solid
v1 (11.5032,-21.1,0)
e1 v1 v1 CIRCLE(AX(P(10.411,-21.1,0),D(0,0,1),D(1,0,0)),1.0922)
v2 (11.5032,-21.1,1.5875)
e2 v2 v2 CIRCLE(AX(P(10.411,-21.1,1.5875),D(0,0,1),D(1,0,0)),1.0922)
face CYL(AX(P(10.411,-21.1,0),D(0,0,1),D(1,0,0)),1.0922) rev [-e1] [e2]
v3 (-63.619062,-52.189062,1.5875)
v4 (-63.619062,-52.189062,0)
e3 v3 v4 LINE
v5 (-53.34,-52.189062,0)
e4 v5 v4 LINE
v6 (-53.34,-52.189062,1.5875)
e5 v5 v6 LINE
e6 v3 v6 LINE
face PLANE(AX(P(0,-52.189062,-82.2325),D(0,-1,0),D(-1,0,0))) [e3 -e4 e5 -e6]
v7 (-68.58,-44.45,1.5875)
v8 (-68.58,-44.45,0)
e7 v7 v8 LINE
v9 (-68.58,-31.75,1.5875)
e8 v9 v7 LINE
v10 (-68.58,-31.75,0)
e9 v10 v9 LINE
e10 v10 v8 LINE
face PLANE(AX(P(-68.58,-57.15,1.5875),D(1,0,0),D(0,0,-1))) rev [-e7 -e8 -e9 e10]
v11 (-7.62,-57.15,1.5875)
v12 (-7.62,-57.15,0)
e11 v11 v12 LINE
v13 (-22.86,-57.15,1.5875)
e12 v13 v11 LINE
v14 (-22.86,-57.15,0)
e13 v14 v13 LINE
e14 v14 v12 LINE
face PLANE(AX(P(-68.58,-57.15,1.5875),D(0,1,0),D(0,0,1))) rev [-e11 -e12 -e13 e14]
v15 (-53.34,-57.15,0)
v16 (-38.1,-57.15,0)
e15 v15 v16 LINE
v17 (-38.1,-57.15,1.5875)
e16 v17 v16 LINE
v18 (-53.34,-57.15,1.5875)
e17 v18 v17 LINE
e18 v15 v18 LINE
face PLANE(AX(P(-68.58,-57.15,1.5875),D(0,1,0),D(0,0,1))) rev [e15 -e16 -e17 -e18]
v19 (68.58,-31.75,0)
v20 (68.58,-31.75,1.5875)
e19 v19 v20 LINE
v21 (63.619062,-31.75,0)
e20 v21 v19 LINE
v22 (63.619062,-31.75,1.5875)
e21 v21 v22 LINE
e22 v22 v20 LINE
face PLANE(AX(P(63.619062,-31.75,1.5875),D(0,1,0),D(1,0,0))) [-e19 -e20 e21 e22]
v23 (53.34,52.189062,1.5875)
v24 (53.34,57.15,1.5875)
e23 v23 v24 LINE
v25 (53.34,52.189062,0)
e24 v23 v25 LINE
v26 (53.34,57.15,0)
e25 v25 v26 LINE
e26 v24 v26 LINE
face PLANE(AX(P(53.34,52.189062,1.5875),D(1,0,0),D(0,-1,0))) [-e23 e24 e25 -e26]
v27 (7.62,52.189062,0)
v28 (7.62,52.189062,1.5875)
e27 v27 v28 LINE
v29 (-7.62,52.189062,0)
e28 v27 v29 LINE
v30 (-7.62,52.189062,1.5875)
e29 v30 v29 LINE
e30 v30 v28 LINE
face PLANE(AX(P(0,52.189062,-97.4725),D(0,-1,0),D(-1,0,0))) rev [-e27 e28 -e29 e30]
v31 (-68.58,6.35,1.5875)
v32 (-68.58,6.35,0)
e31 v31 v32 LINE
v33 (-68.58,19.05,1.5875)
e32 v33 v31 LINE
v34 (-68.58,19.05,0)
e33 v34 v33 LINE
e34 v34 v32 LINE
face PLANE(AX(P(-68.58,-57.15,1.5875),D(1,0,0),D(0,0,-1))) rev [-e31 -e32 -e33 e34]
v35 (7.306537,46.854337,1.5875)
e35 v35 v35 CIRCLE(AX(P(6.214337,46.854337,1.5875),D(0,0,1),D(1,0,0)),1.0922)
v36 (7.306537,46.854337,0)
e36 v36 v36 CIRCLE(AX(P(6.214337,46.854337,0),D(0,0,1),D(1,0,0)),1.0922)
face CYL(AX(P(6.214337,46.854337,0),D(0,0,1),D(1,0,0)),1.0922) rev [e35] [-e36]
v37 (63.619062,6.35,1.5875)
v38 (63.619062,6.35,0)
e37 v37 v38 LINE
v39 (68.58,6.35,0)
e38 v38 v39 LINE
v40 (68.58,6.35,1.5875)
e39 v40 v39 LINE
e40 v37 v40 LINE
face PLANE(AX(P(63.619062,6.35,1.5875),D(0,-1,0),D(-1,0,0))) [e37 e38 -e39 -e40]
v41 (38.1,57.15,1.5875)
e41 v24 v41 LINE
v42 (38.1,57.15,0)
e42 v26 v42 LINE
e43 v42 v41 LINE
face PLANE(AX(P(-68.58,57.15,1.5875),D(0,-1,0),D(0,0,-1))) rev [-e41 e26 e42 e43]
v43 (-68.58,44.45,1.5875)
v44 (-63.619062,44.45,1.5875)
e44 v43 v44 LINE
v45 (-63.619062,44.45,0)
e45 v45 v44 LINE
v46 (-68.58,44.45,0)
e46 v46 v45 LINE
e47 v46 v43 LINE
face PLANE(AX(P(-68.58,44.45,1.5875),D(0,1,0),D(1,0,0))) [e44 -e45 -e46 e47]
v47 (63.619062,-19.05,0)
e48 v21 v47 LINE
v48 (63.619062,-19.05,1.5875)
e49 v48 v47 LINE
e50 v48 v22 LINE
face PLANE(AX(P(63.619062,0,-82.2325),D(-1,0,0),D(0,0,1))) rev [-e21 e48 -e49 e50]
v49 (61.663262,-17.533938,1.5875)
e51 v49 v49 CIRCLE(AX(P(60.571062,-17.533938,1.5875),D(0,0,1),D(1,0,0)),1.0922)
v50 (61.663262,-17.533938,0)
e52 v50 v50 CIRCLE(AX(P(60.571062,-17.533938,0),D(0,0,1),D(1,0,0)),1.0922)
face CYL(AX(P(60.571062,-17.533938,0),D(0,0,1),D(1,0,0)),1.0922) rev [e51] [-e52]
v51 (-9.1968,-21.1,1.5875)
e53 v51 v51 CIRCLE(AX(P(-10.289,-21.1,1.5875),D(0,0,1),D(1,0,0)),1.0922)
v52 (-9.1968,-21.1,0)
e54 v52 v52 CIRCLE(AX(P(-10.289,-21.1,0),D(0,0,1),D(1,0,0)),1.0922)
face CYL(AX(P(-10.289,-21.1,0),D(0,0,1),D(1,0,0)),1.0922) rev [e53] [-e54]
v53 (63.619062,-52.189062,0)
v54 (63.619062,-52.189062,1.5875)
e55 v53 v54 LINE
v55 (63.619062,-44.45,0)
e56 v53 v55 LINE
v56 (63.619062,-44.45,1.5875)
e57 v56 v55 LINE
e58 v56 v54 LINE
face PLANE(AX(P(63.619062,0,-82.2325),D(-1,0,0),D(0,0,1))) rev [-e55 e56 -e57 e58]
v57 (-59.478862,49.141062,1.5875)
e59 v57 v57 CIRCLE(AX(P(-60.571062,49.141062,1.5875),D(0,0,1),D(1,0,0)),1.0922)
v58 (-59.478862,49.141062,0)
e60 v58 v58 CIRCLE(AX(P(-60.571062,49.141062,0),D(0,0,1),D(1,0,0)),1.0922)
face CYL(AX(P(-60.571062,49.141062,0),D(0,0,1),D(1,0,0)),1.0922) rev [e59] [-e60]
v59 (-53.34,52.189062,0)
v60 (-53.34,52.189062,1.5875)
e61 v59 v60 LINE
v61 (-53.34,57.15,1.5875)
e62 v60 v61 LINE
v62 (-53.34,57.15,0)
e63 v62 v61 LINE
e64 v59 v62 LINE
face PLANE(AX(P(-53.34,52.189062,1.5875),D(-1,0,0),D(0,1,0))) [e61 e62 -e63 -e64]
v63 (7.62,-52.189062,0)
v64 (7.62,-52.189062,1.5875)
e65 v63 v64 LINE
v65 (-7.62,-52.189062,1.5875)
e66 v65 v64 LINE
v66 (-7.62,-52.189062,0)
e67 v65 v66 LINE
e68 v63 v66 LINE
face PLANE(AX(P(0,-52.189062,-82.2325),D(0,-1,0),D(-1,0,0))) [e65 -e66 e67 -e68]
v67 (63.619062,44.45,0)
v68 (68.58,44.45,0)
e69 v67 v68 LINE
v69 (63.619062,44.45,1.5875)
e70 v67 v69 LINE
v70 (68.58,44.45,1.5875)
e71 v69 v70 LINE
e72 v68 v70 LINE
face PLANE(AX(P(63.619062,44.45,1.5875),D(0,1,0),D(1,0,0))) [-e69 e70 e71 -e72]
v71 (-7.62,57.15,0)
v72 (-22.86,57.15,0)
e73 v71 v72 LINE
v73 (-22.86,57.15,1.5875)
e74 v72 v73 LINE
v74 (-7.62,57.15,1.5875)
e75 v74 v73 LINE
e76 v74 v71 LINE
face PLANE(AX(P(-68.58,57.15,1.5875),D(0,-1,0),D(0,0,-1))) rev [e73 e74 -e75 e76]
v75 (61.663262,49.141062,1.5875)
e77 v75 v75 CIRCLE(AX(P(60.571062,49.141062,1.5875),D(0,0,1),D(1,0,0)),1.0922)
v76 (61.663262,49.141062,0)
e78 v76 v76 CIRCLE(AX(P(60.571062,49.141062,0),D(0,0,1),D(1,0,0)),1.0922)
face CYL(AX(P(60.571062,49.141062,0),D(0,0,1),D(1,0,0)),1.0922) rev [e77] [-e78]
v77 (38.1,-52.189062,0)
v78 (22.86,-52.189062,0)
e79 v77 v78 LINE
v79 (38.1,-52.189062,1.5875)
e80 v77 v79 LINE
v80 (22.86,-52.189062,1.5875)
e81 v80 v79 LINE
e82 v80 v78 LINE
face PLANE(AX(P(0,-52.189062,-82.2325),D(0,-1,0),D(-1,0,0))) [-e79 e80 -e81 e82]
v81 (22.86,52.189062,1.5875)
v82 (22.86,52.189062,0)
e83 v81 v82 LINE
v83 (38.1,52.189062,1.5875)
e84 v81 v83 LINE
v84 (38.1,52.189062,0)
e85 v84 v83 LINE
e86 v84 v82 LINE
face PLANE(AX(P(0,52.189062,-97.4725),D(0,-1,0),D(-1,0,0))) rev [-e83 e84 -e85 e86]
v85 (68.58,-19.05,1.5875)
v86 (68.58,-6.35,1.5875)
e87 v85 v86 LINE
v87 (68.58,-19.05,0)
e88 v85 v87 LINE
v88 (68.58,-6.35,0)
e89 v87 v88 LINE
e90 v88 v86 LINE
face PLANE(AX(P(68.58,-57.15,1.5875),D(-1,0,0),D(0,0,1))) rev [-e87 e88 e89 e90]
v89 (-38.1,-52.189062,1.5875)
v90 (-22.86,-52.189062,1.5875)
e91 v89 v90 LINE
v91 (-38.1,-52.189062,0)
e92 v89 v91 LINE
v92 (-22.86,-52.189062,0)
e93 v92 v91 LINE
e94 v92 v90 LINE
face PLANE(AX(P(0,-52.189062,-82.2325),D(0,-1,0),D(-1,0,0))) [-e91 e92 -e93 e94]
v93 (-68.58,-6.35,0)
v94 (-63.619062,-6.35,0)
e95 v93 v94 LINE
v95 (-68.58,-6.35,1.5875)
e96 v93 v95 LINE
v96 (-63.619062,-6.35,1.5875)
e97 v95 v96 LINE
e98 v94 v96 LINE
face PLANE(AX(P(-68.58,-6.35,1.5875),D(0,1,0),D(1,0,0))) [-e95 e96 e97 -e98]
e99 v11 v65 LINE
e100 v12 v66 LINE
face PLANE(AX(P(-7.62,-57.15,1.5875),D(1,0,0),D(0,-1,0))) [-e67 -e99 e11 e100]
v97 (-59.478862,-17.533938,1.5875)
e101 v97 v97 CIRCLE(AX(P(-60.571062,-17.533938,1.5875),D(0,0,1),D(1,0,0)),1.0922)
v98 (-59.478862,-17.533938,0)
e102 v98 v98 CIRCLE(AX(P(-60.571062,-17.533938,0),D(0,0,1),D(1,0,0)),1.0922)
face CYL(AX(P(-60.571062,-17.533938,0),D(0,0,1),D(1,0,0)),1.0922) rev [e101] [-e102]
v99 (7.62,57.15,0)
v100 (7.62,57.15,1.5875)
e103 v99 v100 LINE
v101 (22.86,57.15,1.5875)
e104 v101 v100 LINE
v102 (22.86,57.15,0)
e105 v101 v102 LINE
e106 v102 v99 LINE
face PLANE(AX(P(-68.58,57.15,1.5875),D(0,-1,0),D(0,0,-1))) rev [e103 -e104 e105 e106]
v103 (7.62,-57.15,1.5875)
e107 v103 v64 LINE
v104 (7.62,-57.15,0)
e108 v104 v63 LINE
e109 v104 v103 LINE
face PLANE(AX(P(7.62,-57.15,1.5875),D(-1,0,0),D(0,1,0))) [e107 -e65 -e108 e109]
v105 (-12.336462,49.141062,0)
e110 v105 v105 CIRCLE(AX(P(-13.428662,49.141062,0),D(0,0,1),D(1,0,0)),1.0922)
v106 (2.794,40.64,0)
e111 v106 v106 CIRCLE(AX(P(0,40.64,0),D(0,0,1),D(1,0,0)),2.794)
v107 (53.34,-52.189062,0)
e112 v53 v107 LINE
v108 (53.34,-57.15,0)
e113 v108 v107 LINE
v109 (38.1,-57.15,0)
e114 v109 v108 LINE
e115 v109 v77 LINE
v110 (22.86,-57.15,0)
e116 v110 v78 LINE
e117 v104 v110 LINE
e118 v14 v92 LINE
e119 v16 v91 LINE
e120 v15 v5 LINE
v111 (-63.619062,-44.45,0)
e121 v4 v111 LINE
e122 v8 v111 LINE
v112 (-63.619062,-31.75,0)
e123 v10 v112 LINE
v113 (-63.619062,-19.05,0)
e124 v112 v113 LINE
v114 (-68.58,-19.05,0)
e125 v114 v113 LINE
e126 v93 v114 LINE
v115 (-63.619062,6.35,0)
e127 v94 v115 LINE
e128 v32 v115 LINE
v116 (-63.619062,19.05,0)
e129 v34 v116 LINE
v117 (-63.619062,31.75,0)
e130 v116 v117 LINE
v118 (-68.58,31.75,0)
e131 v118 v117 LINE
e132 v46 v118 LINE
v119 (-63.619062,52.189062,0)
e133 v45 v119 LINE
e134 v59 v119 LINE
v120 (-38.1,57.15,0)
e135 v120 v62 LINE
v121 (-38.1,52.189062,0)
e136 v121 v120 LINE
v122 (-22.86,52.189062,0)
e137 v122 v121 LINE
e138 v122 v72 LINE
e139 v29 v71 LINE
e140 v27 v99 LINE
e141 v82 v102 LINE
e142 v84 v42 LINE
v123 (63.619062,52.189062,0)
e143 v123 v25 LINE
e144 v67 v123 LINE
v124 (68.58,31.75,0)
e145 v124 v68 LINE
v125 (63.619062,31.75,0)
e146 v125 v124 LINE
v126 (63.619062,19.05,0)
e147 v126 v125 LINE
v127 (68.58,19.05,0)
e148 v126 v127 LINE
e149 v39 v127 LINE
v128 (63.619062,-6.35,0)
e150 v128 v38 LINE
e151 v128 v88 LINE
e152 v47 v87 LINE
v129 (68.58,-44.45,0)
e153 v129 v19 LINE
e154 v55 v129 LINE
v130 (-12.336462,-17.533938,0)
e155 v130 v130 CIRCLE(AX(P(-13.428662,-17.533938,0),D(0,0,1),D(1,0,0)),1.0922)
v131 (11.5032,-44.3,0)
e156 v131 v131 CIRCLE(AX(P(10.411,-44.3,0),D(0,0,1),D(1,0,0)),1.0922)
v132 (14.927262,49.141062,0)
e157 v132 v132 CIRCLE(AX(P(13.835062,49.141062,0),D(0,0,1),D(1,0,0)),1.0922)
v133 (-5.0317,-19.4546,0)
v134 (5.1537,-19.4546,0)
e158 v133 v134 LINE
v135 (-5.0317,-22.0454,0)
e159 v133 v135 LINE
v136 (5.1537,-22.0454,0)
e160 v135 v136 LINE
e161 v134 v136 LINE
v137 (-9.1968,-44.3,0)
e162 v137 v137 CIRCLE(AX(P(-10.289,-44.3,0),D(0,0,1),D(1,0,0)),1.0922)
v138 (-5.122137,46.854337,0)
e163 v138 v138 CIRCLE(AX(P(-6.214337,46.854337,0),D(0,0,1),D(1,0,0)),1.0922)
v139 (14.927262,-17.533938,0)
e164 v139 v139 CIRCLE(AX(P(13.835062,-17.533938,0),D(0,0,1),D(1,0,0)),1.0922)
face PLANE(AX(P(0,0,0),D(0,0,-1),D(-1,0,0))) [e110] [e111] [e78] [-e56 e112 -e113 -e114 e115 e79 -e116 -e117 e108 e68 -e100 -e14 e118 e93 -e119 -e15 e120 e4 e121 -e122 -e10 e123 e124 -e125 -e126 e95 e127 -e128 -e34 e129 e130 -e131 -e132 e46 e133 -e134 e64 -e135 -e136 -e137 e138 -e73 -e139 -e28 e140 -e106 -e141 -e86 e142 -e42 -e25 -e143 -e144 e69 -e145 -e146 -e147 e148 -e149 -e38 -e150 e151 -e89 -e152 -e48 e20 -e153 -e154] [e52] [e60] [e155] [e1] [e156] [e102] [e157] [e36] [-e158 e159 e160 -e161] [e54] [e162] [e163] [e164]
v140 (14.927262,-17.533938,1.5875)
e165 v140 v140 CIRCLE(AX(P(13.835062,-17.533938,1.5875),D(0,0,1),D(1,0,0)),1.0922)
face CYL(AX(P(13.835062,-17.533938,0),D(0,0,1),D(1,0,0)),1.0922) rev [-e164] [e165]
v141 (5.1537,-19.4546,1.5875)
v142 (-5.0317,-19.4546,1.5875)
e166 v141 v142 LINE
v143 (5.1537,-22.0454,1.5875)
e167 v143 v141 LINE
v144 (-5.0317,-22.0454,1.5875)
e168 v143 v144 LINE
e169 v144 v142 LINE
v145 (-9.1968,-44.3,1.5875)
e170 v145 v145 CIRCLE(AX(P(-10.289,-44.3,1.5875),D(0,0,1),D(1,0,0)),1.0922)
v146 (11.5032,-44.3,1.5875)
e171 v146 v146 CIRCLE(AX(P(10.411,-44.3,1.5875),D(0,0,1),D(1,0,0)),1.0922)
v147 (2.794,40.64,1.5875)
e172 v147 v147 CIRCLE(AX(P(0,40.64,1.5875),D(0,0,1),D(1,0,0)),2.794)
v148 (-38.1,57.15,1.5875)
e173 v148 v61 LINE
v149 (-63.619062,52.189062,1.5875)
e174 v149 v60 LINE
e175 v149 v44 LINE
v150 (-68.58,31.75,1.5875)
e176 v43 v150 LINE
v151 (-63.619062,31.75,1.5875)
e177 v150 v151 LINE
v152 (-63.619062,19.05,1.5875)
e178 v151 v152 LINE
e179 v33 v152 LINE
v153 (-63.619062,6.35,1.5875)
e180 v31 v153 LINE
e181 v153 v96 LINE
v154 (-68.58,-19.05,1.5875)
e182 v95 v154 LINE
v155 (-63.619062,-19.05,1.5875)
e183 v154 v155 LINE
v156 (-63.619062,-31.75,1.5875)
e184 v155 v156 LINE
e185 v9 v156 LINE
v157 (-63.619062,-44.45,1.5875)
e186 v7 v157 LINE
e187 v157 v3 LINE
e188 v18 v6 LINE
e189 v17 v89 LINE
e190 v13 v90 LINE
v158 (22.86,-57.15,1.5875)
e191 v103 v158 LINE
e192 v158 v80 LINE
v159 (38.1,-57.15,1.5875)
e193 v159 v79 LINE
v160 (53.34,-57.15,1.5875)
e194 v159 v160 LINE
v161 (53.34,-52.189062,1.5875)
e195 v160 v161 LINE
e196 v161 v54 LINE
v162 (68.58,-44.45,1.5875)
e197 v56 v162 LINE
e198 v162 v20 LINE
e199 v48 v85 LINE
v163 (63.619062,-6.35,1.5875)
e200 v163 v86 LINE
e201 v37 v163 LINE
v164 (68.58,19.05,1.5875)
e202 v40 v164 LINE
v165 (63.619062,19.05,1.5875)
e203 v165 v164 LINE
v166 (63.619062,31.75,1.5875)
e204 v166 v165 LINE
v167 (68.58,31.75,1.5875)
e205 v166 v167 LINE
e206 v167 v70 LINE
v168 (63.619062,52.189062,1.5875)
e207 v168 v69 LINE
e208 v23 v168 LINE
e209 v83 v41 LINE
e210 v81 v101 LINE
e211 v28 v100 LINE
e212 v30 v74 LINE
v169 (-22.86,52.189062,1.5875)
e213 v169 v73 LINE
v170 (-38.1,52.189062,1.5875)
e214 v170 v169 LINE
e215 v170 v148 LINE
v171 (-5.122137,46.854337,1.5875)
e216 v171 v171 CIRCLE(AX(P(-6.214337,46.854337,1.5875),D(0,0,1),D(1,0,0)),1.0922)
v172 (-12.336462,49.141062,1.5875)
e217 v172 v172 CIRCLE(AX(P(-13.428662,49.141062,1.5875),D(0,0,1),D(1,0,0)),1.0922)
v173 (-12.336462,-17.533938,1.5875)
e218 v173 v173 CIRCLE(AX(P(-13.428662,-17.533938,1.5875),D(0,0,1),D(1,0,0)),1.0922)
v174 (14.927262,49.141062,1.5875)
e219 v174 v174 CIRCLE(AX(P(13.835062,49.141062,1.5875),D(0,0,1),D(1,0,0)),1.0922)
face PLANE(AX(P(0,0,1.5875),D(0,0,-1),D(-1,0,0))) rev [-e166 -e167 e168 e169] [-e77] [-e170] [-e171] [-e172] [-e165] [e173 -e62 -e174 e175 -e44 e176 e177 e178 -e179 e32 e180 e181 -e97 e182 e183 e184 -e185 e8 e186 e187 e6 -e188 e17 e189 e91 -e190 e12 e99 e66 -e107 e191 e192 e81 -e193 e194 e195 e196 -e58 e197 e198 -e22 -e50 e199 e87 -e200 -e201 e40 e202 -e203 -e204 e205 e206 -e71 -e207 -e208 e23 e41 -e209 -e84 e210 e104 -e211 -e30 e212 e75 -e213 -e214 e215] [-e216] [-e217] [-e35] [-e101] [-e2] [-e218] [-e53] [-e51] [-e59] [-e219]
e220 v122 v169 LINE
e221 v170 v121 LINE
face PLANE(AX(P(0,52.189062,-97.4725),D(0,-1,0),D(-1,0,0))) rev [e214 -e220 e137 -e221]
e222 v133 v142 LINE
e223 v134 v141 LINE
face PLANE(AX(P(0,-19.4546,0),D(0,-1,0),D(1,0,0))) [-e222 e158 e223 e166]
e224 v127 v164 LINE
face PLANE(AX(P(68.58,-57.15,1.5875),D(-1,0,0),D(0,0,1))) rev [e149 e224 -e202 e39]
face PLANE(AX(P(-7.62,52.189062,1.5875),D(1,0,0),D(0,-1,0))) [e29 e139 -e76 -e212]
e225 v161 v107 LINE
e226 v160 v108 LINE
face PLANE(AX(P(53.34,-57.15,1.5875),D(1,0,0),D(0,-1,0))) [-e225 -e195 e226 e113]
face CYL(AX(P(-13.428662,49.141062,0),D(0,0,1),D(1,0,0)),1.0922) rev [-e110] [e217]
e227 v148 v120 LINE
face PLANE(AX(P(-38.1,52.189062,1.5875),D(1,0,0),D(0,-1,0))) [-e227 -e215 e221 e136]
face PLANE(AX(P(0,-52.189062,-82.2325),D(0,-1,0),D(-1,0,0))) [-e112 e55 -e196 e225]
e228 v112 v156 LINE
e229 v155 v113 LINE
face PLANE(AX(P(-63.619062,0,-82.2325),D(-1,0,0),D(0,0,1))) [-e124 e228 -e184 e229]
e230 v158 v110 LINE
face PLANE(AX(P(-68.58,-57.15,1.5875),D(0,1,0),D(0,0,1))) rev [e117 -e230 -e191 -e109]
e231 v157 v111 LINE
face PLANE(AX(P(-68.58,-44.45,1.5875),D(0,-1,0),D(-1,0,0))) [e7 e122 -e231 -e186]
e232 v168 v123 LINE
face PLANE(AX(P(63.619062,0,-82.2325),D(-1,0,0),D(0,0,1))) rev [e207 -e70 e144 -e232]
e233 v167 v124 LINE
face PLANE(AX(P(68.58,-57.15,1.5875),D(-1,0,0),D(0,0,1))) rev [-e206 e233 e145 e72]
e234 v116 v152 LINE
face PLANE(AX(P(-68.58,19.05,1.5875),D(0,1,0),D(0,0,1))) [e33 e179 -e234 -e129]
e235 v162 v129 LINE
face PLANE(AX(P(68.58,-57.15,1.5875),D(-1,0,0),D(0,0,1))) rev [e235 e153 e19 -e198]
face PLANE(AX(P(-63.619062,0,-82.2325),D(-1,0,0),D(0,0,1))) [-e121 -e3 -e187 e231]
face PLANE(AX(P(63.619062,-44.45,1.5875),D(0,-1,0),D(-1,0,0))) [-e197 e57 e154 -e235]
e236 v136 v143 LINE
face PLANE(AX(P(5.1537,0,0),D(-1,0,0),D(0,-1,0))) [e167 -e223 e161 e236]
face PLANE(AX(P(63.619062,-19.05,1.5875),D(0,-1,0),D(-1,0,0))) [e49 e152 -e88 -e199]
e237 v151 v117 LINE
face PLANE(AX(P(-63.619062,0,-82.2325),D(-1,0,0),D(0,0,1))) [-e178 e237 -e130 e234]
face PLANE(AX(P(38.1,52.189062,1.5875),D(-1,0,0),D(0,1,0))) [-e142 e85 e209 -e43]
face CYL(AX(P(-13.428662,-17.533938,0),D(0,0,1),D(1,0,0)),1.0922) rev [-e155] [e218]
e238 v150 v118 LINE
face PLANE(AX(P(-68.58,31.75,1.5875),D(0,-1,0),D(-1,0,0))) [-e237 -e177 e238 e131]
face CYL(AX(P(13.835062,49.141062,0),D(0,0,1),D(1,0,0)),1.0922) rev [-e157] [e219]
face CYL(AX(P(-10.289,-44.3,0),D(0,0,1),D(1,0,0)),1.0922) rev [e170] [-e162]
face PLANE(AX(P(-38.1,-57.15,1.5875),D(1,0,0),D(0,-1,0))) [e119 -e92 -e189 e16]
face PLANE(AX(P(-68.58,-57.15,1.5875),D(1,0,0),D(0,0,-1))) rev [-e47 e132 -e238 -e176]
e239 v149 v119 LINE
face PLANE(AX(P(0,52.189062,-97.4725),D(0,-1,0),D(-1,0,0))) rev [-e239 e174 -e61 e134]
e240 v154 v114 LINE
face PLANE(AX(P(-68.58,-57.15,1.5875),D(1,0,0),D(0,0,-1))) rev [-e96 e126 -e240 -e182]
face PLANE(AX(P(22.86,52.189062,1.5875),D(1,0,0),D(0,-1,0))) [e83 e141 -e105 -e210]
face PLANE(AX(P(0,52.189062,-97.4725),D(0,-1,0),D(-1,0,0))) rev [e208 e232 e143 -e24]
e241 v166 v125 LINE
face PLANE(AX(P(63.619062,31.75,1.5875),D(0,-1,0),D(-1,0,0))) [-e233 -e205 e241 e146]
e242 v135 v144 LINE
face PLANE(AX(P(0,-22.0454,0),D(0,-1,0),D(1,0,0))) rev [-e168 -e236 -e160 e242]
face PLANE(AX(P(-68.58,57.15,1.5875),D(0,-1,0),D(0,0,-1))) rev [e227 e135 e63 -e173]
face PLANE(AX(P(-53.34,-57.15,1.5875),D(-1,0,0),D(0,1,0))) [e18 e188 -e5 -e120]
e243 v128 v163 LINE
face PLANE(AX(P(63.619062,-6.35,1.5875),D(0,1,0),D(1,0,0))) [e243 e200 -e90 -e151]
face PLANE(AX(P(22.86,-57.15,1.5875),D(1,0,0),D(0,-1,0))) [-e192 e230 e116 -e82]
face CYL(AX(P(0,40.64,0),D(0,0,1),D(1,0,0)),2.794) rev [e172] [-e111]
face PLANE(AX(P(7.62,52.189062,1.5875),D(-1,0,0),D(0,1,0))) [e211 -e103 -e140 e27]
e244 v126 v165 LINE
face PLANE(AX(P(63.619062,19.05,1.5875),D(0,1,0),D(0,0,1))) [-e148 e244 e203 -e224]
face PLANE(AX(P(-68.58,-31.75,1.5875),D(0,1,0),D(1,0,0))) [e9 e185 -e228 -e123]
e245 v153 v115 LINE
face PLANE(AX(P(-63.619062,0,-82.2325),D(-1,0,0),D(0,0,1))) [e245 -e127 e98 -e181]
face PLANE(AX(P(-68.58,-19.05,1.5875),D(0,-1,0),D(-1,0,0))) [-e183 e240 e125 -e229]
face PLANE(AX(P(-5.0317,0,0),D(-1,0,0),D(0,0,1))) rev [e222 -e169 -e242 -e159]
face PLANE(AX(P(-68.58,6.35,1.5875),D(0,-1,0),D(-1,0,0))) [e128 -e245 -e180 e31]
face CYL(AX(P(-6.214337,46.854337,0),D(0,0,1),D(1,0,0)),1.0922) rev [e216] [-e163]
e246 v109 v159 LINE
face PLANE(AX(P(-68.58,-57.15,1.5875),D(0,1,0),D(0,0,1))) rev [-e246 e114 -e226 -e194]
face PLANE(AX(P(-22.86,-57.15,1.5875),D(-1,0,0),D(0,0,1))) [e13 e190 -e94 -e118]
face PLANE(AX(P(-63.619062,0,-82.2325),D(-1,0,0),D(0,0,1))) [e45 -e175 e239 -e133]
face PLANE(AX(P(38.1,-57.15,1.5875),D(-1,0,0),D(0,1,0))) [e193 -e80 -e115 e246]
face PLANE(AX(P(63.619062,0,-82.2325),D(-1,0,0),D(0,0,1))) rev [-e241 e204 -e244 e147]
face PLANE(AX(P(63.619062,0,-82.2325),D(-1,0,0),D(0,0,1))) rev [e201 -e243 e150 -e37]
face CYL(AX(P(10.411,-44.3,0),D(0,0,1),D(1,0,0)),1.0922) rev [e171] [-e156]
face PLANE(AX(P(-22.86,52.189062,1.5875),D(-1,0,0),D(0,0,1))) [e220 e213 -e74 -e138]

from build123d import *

# Parameters (mm, degrees)
SKETCH1_W               = 137.16
SKETCH1_H               = 114.3
BOSS_EXTRUDE1_DEPTH     = 1.5875
SKETCH2_R               = 2.794
CUT_EXTRUDE2_DEPTH      = 90.285267857
CAVITY7_START           = -68.58
CAVITY7_OUTLINE_W       = 4.9609375
CAVITY7_OUTLINE_H       = 1.5875
CAVITY7_DEPTH           = 15.24
CAVITY7_START_2         = -38.1
CAVITY7_2_OUTLINE_W     = 4.9609375
CAVITY7_2_OUTLINE_H     = 1.5875
CAVITY7_2_DEPTH         = 15.24
CAVITY7_START_3         = -7.62
CAVITY7_3_OUTLINE_W     = 4.9609375
CAVITY7_3_OUTLINE_H     = 1.5875
CAVITY7_3_DEPTH         = 15.24
CAVITY7_START_4         = 22.86
CAVITY7_4_OUTLINE_W     = 4.9609375
CAVITY7_4_OUTLINE_H     = 1.5875
CAVITY7_4_DEPTH         = 15.24
CAVITY7_START_5         = 53.34
CAVITY7_5_OUTLINE_W     = 4.9609375
CAVITY7_5_OUTLINE_H     = 1.5875
CAVITY7_5_DEPTH         = 15.24
CAVITY8_START           = -68.58
CAVITY8_OUTLINE_W       = 4.9609375
CAVITY8_OUTLINE_H       = 1.5875
CAVITY8_DEPTH           = 15.24
CAVITY8_START_2         = -38.1
CAVITY8_2_OUTLINE_W     = 4.9609375
CAVITY8_2_OUTLINE_H     = 1.5875
CAVITY8_2_DEPTH         = 15.24
CAVITY8_START_3         = -7.62
CAVITY8_3_OUTLINE_W     = 4.9609375
CAVITY8_3_OUTLINE_H     = 1.5875
CAVITY8_3_DEPTH         = 15.24
CAVITY8_START_4         = 22.86
CAVITY8_4_OUTLINE_W     = 4.9609375
CAVITY8_4_OUTLINE_H     = 1.5875
CAVITY8_4_DEPTH         = 15.24
CAVITY8_START_5         = 53.34
CAVITY8_5_OUTLINE_W     = 4.9609375
CAVITY8_5_OUTLINE_H     = 1.5875
CAVITY8_5_DEPTH         = 15.24
CAVITY9_START           = -68.58
CAVITY9_OUTLINE_W       = 7.7390625
CAVITY9_OUTLINE_H       = 1.5875
CAVITY9_OUTLINE_W_2     = 12.7
CAVITY9_DEPTH           = 4.9609375
CAVITY10_START          = -31.75
CAVITY10_OUTLINE_W      = 4.9609375
CAVITY10_OUTLINE_H      = 1.5875
CAVITY10_DEPTH          = 12.7
CAVITY10_START_2        = -6.35
CAVITY10_2_OUTLINE_W    = 4.9609375
CAVITY10_2_OUTLINE_H    = 1.5875
CAVITY10_2_DEPTH        = 12.7
CAVITY10_START_3        = 19.05
CAVITY10_3_OUTLINE_W    = 4.9609375
CAVITY10_3_OUTLINE_H    = 1.5875
CAVITY10_3_DEPTH        = 12.7
CAVITY10_START_4        = -52.1890625
CAVITY10_4_OUTLINE_W    = 4.9609375
CAVITY10_4_OUTLINE_H    = 1.5875
CAVITY10_4_DEPTH        = 7.7390625
CAVITY10_START_5        = 44.45
CAVITY10_5_OUTLINE_W    = 4.9609375
CAVITY10_5_OUTLINE_H    = 1.5875
CAVITY10_5_DEPTH        = 7.7390625
CUT_EXTRUDE6_DEPTH      = 90.285267857
CUT_EXTRUDE6_DEPTH_BACK = 90.285267857
SKETCH3_W               = 10.1854
SKETCH3_H               = 2.5908
SKETCH5_R               = 1.0922
CUT_EXTRUDE7_DEPTH      = 90.285267857
SKETCH6_R               = 1.0922
CUT_EXTRUDE8_DEPTH      = 90.285267857
SKETCH7_R               = 1.0922
CUT_EXTRUDE9_DEPTH      = 90.285267857
SKETCH8_R               = 1.0922
CUT_EXTRUDE10_DEPTH     = 90.285267857
SKETCH9_R               = 1.0922
CUT_EXTRUDE11_DEPTH     = 90.285267857
SKETCH10_R              = 1.0922
CUT_EXTRUDE12_DEPTH     = 90.285267857


# Read off the part's stored shape, not the designer's step: Cavity7, Cavity8, Cavity9, Cavity10
with BuildPart() as part:
    # Sketch1 → Boss-Extrude1 (new body)
    with BuildSketch(Plane.XY):
        Rectangle(SKETCH1_W, SKETCH1_H)
    extrude(amount=BOSS_EXTRUDE1_DEPTH)

    # Sketch2 → Cut-Extrude2 (cut, through all)
    with BuildSketch(Plane.XY.offset(1.5875)):
        with Locations((0, 40.64)):
            Circle(SKETCH2_R)
    extrude(amount=-CUT_EXTRUDE2_DEPTH, mode=Mode.SUBTRACT)

    # Cavity7 outline → Cavity7 (cut)
    with BuildSketch(Plane.YZ.offset(CAVITY7_START)):
        with Locations((-54.66953125, 0.79375)):
            Rectangle(CAVITY7_OUTLINE_W, CAVITY7_OUTLINE_H)
    extrude(amount=CAVITY7_DEPTH, mode=Mode.SUBTRACT)

    # Cavity7 2 outline → Cavity7 2 (cut)
    with BuildSketch(Plane.YZ.offset(CAVITY7_START_2)):
        with Locations((-54.66953125, 0.79375)):
            Rectangle(CAVITY7_2_OUTLINE_W, CAVITY7_2_OUTLINE_H)
    extrude(amount=CAVITY7_2_DEPTH, mode=Mode.SUBTRACT)

    # Cavity7 3 outline → Cavity7 3 (cut)
    with BuildSketch(Plane.YZ.offset(CAVITY7_START_3)):
        with Locations((-54.66953125, 0.79375)):
            Rectangle(CAVITY7_3_OUTLINE_W, CAVITY7_3_OUTLINE_H)
    extrude(amount=CAVITY7_3_DEPTH, mode=Mode.SUBTRACT)

    # Cavity7 4 outline → Cavity7 4 (cut)
    with BuildSketch(Plane.YZ.offset(CAVITY7_START_4)):
        with Locations((-54.66953125, 0.79375)):
            Rectangle(CAVITY7_4_OUTLINE_W, CAVITY7_4_OUTLINE_H)
    extrude(amount=CAVITY7_4_DEPTH, mode=Mode.SUBTRACT)

    # Cavity7 5 outline → Cavity7 5 (cut)
    with BuildSketch(Plane.YZ.offset(CAVITY7_START_5)):
        with Locations((-54.66953125, 0.79375)):
            Rectangle(CAVITY7_5_OUTLINE_W, CAVITY7_5_OUTLINE_H)
    extrude(amount=CAVITY7_5_DEPTH, mode=Mode.SUBTRACT)

    # Cavity8 outline → Cavity8 (cut)
    with BuildSketch(Plane.YZ.offset(CAVITY8_START)):
        with Locations((54.66953125, 0.79375)):
            Rectangle(CAVITY8_OUTLINE_W, CAVITY8_OUTLINE_H)
    extrude(amount=CAVITY8_DEPTH, mode=Mode.SUBTRACT)

    # Cavity8 2 outline → Cavity8 2 (cut)
    with BuildSketch(Plane.YZ.offset(CAVITY8_START_2)):
        with Locations((54.66953125, 0.79375)):
            Rectangle(CAVITY8_2_OUTLINE_W, CAVITY8_2_OUTLINE_H)
    extrude(amount=CAVITY8_2_DEPTH, mode=Mode.SUBTRACT)

    # Cavity8 3 outline → Cavity8 3 (cut)
    with BuildSketch(Plane.YZ.offset(CAVITY8_START_3)):
        with Locations((54.66953125, 0.79375)):
            Rectangle(CAVITY8_3_OUTLINE_W, CAVITY8_3_OUTLINE_H)
    extrude(amount=CAVITY8_3_DEPTH, mode=Mode.SUBTRACT)

    # Cavity8 4 outline → Cavity8 4 (cut)
    with BuildSketch(Plane.YZ.offset(CAVITY8_START_4)):
        with Locations((54.66953125, 0.79375)):
            Rectangle(CAVITY8_4_OUTLINE_W, CAVITY8_4_OUTLINE_H)
    extrude(amount=CAVITY8_4_DEPTH, mode=Mode.SUBTRACT)

    # Cavity8 5 outline → Cavity8 5 (cut)
    with BuildSketch(Plane.YZ.offset(CAVITY8_START_5)):
        with Locations((54.66953125, 0.79375)):
            Rectangle(CAVITY8_5_OUTLINE_W, CAVITY8_5_OUTLINE_H)
    extrude(amount=CAVITY8_5_DEPTH, mode=Mode.SUBTRACT)

    # Cavity9 outline → Cavity9 (cut)
    with BuildSketch(Plane.YZ.offset(CAVITY9_START)):
        with Locations((48.31953125, 0.79375)):
            Rectangle(CAVITY9_OUTLINE_W, CAVITY9_OUTLINE_H)
        with Locations((25.4, 0.79375)):
            Rectangle(CAVITY9_OUTLINE_W_2, CAVITY9_OUTLINE_H)
        with Locations((0, 0.79375)):
            Rectangle(CAVITY9_OUTLINE_W_2, CAVITY9_OUTLINE_H)
        with Locations((-25.4, 0.79375)):
            Rectangle(CAVITY9_OUTLINE_W_2, CAVITY9_OUTLINE_H)
        with Locations((-48.31953125, 0.79375)):
            Rectangle(CAVITY9_OUTLINE_W, CAVITY9_OUTLINE_H)
    extrude(amount=CAVITY9_DEPTH, mode=Mode.SUBTRACT)

    # Cavity10 outline → Cavity10 (cut)
    with BuildSketch(Plane(origin=(0, 0, 0), x_dir=(1, 0, 0), z_dir=(0, 1, 0)).offset(CAVITY10_START)):
        with Locations((66.09953125, -0.79375)):
            Rectangle(CAVITY10_OUTLINE_W, CAVITY10_OUTLINE_H)
    extrude(amount=CAVITY10_DEPTH, mode=Mode.SUBTRACT)

    # Cavity10 2 outline → Cavity10 2 (cut)
    with BuildSketch(Plane(origin=(0, 0, 0), x_dir=(1, 0, 0), z_dir=(0, 1, 0)).offset(CAVITY10_START_2)):
        with Locations((66.09953125, -0.79375)):
            Rectangle(CAVITY10_2_OUTLINE_W, CAVITY10_2_OUTLINE_H)
    extrude(amount=CAVITY10_2_DEPTH, mode=Mode.SUBTRACT)

    # Cavity10 3 outline → Cavity10 3 (cut)
    with BuildSketch(Plane(origin=(0, 0, 0), x_dir=(1, 0, 0), z_dir=(0, 1, 0)).offset(CAVITY10_START_3)):
        with Locations((66.09953125, -0.79375)):
            Rectangle(CAVITY10_3_OUTLINE_W, CAVITY10_3_OUTLINE_H)
    extrude(amount=CAVITY10_3_DEPTH, mode=Mode.SUBTRACT)

    # Cavity10 4 outline → Cavity10 4 (cut)
    with BuildSketch(Plane(origin=(0, 0, 0), x_dir=(1, 0, 0), z_dir=(0, 1, 0)).offset(CAVITY10_START_4)):
        with Locations((66.09953125, -0.79375)):
            Rectangle(CAVITY10_4_OUTLINE_W, CAVITY10_4_OUTLINE_H)
    extrude(amount=CAVITY10_4_DEPTH, mode=Mode.SUBTRACT)

    # Cavity10 5 outline → Cavity10 5 (cut)
    with BuildSketch(Plane(origin=(0, 0, 0), x_dir=(1, 0, 0), z_dir=(0, 1, 0)).offset(CAVITY10_START_5)):
        with Locations((66.09953125, -0.79375)):
            Rectangle(CAVITY10_5_OUTLINE_W, CAVITY10_5_OUTLINE_H)
    extrude(amount=CAVITY10_5_DEPTH, mode=Mode.SUBTRACT)

    # Sketch3 → Cut-Extrude6 (cut, two sides: drawn at the far end of the back side and taken through both)
    with BuildSketch(Plane.XY.offset(1.5875).offset(-CUT_EXTRUDE6_DEPTH_BACK)):
        with Locations((0.061, -20.75)):
            Rectangle(SKETCH3_W, SKETCH3_H)
    extrude(amount=CUT_EXTRUDE6_DEPTH + CUT_EXTRUDE6_DEPTH_BACK, mode=Mode.SUBTRACT)

    # Sketch5 → Cut-Extrude7 (cut, through all)
    with BuildSketch(Plane.XY.offset(1.5875)):
        with Locations((-10.289, -21.1)):
            Circle(SKETCH5_R)
    extrude(amount=-CUT_EXTRUDE7_DEPTH, mode=Mode.SUBTRACT)

    # Sketch6 → Cut-Extrude8 (cut, through all)
    with BuildSketch(Plane.XY.offset(1.5875)):
        with Locations((10.411, -21.1)):
            Circle(SKETCH6_R)
    extrude(amount=-CUT_EXTRUDE8_DEPTH, mode=Mode.SUBTRACT)

    # Sketch7 → Cut-Extrude9 (cut, through all)
    with BuildSketch(Plane.XY.offset(1.5875)):
        with Locations((10.411, -44.3)):
            Circle(SKETCH7_R)
    extrude(amount=-CUT_EXTRUDE9_DEPTH, mode=Mode.SUBTRACT)

    # Sketch8 → Cut-Extrude10 (cut, through all)
    with BuildSketch(Plane.XY.offset(1.5875)):
        with Locations((-10.289, -44.3)):
            Circle(SKETCH8_R)
    extrude(amount=-CUT_EXTRUDE10_DEPTH, mode=Mode.SUBTRACT)

    # Sketch9 → Cut-Extrude11 (cut, through all)
    with BuildSketch(Plane.XY.offset(1.5875)):
        with Locations((60.5710625, 49.1410625)):
            Circle(SKETCH9_R)
        with Locations((13.8350625, 49.1410625)):
            Circle(SKETCH9_R)
        with Locations((13.8350625, -17.5339375)):
            Circle(SKETCH9_R)
        with Locations((60.5710625, -17.5339375)):
            Circle(SKETCH9_R)
        with Locations((-13.4286625, 49.1410625)):
            Circle(SKETCH9_R)
        with Locations((-60.5710625, 49.1410625)):
            Circle(SKETCH9_R)
        with Locations((-60.5710625, -17.5339375)):
            Circle(SKETCH9_R)
        with Locations((-13.4286625, -17.5339375)):
            Circle(SKETCH9_R)
    extrude(amount=-CUT_EXTRUDE11_DEPTH, mode=Mode.SUBTRACT)

    # Sketch10 → Cut-Extrude12 (cut, through all)
    with BuildSketch(Plane.XY.offset(1.5875)):
        with Locations((-6.214337236, 46.854337236)):
            Circle(SKETCH10_R)
        with Locations((6.214337236, 46.854337236)):
            Circle(SKETCH10_R)
    extrude(amount=-CUT_EXTRUDE12_DEPTH, mode=Mode.SUBTRACT)


solid = part.part
